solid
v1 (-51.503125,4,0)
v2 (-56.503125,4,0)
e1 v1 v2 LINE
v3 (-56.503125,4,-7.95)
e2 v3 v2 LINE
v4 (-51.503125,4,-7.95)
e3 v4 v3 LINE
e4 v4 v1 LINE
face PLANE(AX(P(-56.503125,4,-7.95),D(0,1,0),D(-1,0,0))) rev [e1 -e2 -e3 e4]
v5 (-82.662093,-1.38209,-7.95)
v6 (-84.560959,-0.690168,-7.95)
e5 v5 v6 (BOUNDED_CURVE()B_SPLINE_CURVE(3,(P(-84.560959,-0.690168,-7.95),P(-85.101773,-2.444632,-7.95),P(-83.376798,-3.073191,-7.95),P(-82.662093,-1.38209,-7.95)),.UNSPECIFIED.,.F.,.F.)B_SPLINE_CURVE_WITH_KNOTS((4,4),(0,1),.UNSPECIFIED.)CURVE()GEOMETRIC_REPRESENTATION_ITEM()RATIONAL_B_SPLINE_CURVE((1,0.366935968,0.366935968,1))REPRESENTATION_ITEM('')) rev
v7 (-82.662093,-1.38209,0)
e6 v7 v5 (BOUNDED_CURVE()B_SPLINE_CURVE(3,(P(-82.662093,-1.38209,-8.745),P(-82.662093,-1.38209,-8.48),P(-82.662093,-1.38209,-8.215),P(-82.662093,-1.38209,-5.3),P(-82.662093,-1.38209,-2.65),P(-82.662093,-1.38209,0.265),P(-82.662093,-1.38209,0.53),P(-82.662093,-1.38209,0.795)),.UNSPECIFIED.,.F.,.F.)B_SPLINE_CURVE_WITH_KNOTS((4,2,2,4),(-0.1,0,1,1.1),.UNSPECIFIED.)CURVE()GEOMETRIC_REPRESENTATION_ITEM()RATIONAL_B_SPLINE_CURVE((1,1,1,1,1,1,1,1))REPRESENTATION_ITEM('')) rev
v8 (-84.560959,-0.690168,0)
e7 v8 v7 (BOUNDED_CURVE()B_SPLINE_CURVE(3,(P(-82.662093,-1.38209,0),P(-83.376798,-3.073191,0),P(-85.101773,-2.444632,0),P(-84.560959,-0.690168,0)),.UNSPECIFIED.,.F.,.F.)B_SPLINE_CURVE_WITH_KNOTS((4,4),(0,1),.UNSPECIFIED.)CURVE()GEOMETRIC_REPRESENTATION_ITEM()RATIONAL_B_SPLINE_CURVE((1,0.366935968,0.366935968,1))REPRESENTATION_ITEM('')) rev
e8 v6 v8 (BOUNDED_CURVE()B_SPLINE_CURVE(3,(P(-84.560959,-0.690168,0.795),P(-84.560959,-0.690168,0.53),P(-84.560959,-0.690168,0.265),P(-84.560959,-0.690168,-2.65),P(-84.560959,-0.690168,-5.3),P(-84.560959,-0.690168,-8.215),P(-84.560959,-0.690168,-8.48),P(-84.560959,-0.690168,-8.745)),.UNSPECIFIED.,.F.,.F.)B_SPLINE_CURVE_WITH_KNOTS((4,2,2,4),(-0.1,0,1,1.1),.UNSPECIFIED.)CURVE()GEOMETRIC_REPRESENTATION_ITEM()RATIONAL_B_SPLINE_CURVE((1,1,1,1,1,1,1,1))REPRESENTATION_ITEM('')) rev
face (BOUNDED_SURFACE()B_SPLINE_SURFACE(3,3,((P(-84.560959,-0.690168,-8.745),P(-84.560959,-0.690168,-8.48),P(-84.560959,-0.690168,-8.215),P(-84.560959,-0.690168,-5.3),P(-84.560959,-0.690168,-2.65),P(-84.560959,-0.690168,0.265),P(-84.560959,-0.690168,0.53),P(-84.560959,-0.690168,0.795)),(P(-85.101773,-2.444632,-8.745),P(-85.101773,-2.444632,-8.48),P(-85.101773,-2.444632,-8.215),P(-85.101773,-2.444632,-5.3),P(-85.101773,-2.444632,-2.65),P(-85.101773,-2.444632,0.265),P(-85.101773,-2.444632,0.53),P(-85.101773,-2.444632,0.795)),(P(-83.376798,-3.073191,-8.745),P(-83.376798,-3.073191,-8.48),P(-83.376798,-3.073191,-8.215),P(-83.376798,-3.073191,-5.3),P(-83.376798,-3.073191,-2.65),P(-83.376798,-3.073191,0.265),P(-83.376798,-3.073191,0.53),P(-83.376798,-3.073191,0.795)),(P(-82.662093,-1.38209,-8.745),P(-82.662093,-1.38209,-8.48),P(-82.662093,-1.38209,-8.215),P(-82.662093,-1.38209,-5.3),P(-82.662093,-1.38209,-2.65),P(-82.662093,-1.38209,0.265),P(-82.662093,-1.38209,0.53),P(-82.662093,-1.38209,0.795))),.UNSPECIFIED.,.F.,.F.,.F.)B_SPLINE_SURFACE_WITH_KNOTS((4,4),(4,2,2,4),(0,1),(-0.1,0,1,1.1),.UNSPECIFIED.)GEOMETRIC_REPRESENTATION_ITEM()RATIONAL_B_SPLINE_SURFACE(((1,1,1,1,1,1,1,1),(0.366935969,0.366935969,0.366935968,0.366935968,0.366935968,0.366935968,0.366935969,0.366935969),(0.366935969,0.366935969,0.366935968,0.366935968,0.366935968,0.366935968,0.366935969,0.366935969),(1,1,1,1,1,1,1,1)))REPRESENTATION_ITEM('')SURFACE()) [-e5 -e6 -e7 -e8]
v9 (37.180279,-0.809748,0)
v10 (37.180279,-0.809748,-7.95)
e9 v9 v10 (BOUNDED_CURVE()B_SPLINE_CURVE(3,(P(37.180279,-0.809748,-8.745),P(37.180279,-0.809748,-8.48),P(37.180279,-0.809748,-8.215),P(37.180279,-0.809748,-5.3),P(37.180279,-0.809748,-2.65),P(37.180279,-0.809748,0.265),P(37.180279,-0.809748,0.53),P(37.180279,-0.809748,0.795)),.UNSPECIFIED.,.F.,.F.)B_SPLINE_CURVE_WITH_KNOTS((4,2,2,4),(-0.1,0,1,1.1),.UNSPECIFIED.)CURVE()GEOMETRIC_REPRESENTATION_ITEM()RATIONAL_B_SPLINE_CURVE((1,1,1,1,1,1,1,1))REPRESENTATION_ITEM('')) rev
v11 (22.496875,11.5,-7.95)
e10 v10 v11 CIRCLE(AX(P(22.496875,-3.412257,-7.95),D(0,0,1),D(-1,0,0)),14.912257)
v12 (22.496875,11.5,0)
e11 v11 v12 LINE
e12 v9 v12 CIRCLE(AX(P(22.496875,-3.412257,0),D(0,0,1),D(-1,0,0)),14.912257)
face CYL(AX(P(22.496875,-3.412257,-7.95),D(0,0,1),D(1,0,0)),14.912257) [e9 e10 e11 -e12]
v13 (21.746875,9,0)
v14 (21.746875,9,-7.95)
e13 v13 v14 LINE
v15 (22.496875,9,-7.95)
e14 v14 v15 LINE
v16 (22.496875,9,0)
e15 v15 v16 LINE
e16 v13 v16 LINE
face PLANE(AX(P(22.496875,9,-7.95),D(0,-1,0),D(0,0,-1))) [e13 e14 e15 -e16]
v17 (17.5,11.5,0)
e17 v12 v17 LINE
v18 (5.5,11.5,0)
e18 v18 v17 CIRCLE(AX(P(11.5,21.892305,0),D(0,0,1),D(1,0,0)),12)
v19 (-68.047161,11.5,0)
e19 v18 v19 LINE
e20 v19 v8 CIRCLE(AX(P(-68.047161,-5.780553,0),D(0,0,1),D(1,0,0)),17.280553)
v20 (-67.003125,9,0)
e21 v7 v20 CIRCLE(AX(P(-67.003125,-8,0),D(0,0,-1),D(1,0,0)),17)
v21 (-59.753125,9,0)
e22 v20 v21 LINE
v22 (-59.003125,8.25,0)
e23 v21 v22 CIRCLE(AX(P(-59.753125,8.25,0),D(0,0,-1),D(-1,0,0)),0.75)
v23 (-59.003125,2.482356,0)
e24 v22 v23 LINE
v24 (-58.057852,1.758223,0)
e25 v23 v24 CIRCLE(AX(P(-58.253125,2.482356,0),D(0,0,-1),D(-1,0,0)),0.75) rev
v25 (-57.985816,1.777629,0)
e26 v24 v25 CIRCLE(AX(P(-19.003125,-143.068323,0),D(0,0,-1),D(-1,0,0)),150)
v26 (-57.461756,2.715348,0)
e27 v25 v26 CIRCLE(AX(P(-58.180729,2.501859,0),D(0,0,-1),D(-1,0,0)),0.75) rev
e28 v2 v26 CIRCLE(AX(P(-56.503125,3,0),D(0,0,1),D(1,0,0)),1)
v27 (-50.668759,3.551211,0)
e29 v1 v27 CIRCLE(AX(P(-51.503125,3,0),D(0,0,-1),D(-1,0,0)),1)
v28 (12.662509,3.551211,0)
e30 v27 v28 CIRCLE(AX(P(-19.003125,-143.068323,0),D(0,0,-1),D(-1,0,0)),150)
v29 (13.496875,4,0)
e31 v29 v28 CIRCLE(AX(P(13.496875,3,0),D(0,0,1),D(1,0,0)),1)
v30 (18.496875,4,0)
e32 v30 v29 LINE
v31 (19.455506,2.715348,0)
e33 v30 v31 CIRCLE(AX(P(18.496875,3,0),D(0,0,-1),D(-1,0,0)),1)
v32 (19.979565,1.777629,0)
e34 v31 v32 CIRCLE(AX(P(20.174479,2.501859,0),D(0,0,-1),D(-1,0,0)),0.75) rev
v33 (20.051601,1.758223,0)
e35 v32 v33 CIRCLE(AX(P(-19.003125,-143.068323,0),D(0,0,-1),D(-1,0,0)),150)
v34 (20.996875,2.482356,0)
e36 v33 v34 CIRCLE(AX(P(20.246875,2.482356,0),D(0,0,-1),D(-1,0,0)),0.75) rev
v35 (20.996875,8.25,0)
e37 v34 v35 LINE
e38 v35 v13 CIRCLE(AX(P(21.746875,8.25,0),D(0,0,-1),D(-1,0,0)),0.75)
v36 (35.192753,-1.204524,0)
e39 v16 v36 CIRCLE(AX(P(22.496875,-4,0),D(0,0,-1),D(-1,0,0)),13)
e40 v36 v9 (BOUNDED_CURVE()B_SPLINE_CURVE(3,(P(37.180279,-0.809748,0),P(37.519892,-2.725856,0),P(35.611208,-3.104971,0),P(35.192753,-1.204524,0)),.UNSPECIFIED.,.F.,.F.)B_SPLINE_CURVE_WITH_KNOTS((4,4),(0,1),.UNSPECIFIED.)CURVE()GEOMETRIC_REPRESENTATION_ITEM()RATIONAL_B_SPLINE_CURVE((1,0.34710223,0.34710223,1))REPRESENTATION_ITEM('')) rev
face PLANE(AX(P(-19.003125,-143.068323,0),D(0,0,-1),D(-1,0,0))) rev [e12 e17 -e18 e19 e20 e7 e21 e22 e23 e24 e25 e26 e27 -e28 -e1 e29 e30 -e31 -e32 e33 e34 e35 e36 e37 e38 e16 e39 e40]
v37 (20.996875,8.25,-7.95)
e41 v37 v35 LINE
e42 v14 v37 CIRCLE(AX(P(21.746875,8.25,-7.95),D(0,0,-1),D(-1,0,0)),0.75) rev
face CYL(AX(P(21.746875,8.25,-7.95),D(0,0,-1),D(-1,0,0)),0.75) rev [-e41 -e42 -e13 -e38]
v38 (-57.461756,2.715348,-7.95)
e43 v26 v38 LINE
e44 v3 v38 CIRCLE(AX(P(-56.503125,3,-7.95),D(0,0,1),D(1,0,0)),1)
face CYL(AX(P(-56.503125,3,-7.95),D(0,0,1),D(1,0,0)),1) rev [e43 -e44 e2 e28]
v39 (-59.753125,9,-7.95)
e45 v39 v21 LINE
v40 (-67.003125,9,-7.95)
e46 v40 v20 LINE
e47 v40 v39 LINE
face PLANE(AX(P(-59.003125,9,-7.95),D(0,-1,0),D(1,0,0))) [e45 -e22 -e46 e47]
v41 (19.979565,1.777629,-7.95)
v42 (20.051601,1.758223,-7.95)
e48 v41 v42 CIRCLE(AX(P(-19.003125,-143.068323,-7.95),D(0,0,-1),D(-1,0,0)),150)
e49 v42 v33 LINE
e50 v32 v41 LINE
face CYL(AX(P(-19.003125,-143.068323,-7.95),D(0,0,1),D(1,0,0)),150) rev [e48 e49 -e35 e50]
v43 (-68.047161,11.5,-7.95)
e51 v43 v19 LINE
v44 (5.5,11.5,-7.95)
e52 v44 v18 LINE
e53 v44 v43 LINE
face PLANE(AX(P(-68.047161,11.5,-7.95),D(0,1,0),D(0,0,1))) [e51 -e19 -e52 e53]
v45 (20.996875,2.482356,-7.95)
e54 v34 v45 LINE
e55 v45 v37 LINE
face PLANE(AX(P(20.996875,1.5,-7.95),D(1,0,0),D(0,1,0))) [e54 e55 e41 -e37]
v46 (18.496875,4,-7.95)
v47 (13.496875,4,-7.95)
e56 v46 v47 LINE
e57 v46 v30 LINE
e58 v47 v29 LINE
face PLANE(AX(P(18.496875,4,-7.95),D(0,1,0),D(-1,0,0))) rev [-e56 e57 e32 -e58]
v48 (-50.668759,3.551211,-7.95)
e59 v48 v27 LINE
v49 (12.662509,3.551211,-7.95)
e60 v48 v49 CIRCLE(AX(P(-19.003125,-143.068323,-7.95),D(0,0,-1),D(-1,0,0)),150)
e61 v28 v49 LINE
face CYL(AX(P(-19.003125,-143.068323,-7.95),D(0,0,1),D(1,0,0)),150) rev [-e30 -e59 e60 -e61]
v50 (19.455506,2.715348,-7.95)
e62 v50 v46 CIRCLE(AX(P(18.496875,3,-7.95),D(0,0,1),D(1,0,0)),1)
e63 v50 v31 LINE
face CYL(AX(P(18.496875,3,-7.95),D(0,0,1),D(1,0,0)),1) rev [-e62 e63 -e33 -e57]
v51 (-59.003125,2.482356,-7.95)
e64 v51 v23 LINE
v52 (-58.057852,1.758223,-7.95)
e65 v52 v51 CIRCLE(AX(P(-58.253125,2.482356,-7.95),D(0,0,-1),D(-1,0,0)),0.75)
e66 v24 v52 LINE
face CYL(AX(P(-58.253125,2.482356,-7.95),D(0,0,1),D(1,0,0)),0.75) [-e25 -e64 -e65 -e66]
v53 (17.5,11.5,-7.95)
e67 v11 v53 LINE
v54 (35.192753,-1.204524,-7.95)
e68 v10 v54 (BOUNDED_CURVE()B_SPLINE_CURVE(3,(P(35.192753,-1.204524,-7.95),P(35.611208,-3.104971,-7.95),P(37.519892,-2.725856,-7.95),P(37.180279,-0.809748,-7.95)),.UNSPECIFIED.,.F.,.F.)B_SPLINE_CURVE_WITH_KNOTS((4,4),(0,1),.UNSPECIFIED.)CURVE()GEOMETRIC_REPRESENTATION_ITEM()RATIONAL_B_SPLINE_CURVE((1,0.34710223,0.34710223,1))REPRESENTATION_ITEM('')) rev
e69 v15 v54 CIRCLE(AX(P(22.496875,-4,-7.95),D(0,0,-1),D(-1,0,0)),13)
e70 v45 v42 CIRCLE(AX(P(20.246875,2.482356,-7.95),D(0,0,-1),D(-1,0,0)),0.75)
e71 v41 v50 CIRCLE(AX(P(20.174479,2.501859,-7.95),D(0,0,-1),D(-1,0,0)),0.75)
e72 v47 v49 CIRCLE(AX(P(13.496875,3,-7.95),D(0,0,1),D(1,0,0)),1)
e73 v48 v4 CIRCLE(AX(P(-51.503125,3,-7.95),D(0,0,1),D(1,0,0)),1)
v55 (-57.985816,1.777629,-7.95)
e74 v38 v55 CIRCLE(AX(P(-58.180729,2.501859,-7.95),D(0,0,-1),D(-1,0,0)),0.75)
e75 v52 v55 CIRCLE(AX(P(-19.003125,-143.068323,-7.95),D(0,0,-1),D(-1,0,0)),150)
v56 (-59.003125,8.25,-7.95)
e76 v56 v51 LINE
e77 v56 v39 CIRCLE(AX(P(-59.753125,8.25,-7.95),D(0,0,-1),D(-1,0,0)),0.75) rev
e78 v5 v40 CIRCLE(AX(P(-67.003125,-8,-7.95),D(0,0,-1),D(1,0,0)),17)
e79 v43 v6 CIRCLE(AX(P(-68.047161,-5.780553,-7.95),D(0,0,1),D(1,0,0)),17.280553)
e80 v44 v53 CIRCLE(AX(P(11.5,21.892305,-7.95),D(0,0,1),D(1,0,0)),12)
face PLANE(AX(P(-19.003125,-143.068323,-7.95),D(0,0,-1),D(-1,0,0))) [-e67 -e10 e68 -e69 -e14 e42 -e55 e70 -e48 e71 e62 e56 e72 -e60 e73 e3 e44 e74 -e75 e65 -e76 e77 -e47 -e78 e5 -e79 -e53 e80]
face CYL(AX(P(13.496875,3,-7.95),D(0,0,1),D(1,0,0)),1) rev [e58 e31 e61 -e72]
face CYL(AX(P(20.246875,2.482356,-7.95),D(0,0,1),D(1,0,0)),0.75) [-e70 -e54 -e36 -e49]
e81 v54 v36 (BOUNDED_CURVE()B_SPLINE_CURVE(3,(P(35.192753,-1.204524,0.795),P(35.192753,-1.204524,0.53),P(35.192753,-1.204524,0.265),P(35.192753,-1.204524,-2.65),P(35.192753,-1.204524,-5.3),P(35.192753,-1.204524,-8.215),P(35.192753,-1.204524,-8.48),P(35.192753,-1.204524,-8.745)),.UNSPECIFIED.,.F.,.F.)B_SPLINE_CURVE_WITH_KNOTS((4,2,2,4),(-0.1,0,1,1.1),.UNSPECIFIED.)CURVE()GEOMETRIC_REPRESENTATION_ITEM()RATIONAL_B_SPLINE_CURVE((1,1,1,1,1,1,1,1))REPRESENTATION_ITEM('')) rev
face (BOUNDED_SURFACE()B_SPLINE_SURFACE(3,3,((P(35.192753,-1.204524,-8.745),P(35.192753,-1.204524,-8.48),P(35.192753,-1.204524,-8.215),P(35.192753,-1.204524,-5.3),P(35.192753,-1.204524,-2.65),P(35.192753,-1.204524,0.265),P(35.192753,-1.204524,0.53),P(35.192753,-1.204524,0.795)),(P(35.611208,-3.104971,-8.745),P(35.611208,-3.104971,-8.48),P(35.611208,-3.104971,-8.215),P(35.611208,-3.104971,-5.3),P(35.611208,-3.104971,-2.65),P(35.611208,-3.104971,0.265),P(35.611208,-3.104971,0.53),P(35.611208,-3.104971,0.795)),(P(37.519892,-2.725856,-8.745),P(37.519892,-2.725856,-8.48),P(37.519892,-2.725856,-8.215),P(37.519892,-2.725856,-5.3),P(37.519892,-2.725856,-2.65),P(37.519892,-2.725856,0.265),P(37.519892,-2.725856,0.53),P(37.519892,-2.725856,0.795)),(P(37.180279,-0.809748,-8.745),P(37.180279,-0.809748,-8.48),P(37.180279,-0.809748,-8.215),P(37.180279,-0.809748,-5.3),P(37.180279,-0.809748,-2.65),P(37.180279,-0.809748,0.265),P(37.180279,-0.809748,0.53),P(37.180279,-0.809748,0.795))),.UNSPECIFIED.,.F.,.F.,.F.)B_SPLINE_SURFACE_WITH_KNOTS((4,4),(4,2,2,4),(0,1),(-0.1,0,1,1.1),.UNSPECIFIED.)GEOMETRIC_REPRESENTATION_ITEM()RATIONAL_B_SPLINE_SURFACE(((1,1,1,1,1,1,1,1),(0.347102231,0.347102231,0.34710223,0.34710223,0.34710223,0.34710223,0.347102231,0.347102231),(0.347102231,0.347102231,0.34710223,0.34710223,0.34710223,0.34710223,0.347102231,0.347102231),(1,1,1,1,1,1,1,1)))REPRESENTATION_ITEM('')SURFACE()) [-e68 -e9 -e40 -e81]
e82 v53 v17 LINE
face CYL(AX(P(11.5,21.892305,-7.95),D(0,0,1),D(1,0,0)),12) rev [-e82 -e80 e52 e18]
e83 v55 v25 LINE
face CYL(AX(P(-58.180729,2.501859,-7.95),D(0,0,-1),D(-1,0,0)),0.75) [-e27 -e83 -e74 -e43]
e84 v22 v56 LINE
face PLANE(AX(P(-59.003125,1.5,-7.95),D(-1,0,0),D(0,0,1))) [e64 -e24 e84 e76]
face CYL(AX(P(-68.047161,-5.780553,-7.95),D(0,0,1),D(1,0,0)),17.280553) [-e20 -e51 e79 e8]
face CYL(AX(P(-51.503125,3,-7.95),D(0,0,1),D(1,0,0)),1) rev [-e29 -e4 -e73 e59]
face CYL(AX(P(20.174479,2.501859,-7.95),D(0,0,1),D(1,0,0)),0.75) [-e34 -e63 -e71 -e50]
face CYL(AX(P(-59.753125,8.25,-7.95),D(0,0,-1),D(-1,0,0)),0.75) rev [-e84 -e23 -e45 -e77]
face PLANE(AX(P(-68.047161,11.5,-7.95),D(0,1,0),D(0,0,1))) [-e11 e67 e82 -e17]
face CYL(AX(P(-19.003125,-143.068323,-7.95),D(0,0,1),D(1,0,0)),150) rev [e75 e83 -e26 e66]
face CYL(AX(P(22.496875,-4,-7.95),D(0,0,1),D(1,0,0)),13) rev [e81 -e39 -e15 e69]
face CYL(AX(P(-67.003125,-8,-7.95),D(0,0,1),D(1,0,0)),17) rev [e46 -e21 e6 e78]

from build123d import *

# Parameters (mm, degrees)
EXTRUDE_1210_DEPTH     = 7.95
CUT_EXTRUDE_1739_DEPTH = 87.052353761
FILLET_1_R             = 0.75
CUT_EXTRUDE_3017_DEPTH = 87.052353882
FILLET_START           = -9
FILLET_2_DEPTH         = 10
FILLET_3_DEPTH         = 10


with BuildPart() as part:
    # Эскиз1 → Extrude 1210 (new body)
    with BuildSketch(Plane.XY):
        with BuildLine():
            Line((-59.003125249, 1.5), (-59.003125249, 9))
            Line((-59.003125249, 9), (-67.003125249, 9))
            ThreePointArc((-67.003125249, 9), (-76.672665052, 5.982131454), (-82.909098969, -2))
            Line((-82.909098969, -2), (-84.909098969, -2))
            ThreePointArc((-84.909098969, -2), (-78.847334249, 7.709212734), (-68.047161318, 11.5))
            Line((-68.047161318, 11.5), (0, 11.5))
            Line((0, 11.5), (22.496874751, 11.5))
            ThreePointArc((22.496874751, 11.5), (32.529707481, 7.620316306), (37.34210733, -2))
            Line((37.34210733, -2), (35.34210733, -2))
            ThreePointArc((35.34210733, -2), (30.952642014, 5.874208829), (22.496874751, 9))
            Line((22.496874751, 9), (20.996874751, 9))
            Line((20.996874751, 9), (20.996874751, 1.5))
            ThreePointArc((20.996874751, 1.5), (-19.003125249, 6.931677052), (-59.003125249, 1.5))
        make_face()
    extrude(amount=-EXTRUDE_1210_DEPTH)

    # Эскиз5 → Cut-Extrude 1739 (cut, through all)
    with BuildSketch(Plane.XY):
        with BuildLine():
            Line((-56.503125249, 4), (-51.503125249, 4))
            ThreePointArc((-51.503125249, 4), (-50.503125249, 3), (-51.503125249, 2))
            Line((-51.503125249, 2), (-56.503125249, 2))
            ThreePointArc((-56.503125249, 2), (-57.503125249, 3), (-56.503125249, 4))
        make_face()
        with BuildLine():
            Line((18.496874751, 2), (13.496874751, 2))
            ThreePointArc((13.496874751, 2), (12.496874751, 3), (13.496874751, 4))
            Line((13.496874751, 4), (18.496874751, 4))
            ThreePointArc((18.496874751, 4), (19.496874751, 3), (18.496874751, 2))
        make_face()
    extrude(amount=-CUT_EXTRUDE_1739_DEPTH, mode=Mode.SUBTRACT)

    # Скругление1
    fillet_1_edges = [part.edges().sort_by_distance(p)[0] for p in [
        (-59.003125249, 1.5, -3.975),
        (-59.003125249, 9, -3.975),
        (20.996874751, 9, -3.975),
        (20.996874751, 1.5, -3.975),
        (-56.87546785, 2.071904645, -3.975),
        (18.869217353, 2.071904645, -3.975),
    ]]
    fillet(fillet_1_edges, radius=FILLET_1_R)

    # Эскиз3 → Cut-Extrude 3017 (cut, through all)
    with BuildSketch(Plane.XY):
        with BuildLine():
            Line((5.5, 11.5), (17.5, 11.5))
            ThreePointArc((17.5, 11.5), (11.5, 9.892304845), (5.5, 11.5))
        make_face()
    extrude(amount=-CUT_EXTRUDE_3017_DEPTH, mode=Mode.SUBTRACT)

    # Скругление2: read off the stored shape, not the designer's step
    # Скругление2 outline → Скругление2 (cut)
    with BuildSketch(Plane.XY.offset(FILLET_START)):
        with BuildLine():
            add(Edge.make_bspline(
                [(-83.594065856, -1.999999999), (-83.128693054, -2), (-82.805959239, -1.722499415), (-82.662093068, -1.382090449)],
                knots=[0.592824962, 0.592824962, 0.592824962, 0.592824962, 1, 1, 1, 1], degree=3, weights=[0.541566314, 0.5894209, 0.742232129, 1]))
            Line((-83.594065856, -1.999999999), (-82.909098969, -2))
            ThreePointArc((-82.909098969, -2), (-82.78861975, -1.689836505), (-82.662093068, -1.382090449))
        make_face()
        with BuildLine():
            add(Edge.make_bspline(
                [(-84.560958648, -0.690168037), (-84.749276161, -1.301091768), (-84.44037433, -1.999999997), (-83.594065856, -1.999999999)],
                knots=[0, 0, 0, 0, 0.592824962, 0.592824962, 0.592824962, 0.592824962], degree=3, weights=[1, 0.624703839, 0.47189261, 0.541566314]))
            ThreePointArc((-84.560958648, -0.690168037), (-84.747874965, -1.341669638), (-84.909098969, -2))
            Line((-84.909098969, -2), (-83.594065856, -1.999999999))
        make_face()
    extrude(amount=FILLET_2_DEPTH, mode=Mode.SUBTRACT)

    # Скругление3: read off the stored shape, not the designer's step
    # Скругление3 outline → Скругление3 (cut)
    with BuildSketch(Plane.XY.offset(FILLET_START)):
        with BuildLine():
            add(Edge.make_bspline(
                [(36.182438008, -1.999999999), (36.957978226, -1.999999999), (37.281497294, -1.380826049), (37.180278652, -0.809748442)],
                knots=[0.449797355, 0.449797355, 0.449797355, 0.449797355, 1, 1, 1, 1], degree=3, weights=[0.515263178, 0.479194979, 0.64077392, 1]))
            Line((36.182438008, -1.999999999), (37.34210733, -2))
            ThreePointArc((37.34210733, -2), (37.273182402, -1.40324412), (37.180278652, -0.809748442))
        make_face()
        with BuildLine():
            add(Edge.make_bspline(
                [(35.192752533, -1.204523772), (35.28524719, -1.624595617), (35.624720765, -1.999999999), (36.182438008, -1.999999999)],
                knots=[0, 0, 0, 0, 0.449797355, 0.449797355, 0.449797355, 0.449797355], degree=3, weights=[1, 0.70632831, 0.544749369, 0.515263178]))
            ThreePointArc((35.192752533, -1.204523772), (35.273622194, -1.601099256), (35.34210733, -2))
            Line((35.34210733, -2), (36.182438008, -1.999999999))
        make_face()
    extrude(amount=FILLET_3_DEPTH, mode=Mode.SUBTRACT)


solid = part.part
